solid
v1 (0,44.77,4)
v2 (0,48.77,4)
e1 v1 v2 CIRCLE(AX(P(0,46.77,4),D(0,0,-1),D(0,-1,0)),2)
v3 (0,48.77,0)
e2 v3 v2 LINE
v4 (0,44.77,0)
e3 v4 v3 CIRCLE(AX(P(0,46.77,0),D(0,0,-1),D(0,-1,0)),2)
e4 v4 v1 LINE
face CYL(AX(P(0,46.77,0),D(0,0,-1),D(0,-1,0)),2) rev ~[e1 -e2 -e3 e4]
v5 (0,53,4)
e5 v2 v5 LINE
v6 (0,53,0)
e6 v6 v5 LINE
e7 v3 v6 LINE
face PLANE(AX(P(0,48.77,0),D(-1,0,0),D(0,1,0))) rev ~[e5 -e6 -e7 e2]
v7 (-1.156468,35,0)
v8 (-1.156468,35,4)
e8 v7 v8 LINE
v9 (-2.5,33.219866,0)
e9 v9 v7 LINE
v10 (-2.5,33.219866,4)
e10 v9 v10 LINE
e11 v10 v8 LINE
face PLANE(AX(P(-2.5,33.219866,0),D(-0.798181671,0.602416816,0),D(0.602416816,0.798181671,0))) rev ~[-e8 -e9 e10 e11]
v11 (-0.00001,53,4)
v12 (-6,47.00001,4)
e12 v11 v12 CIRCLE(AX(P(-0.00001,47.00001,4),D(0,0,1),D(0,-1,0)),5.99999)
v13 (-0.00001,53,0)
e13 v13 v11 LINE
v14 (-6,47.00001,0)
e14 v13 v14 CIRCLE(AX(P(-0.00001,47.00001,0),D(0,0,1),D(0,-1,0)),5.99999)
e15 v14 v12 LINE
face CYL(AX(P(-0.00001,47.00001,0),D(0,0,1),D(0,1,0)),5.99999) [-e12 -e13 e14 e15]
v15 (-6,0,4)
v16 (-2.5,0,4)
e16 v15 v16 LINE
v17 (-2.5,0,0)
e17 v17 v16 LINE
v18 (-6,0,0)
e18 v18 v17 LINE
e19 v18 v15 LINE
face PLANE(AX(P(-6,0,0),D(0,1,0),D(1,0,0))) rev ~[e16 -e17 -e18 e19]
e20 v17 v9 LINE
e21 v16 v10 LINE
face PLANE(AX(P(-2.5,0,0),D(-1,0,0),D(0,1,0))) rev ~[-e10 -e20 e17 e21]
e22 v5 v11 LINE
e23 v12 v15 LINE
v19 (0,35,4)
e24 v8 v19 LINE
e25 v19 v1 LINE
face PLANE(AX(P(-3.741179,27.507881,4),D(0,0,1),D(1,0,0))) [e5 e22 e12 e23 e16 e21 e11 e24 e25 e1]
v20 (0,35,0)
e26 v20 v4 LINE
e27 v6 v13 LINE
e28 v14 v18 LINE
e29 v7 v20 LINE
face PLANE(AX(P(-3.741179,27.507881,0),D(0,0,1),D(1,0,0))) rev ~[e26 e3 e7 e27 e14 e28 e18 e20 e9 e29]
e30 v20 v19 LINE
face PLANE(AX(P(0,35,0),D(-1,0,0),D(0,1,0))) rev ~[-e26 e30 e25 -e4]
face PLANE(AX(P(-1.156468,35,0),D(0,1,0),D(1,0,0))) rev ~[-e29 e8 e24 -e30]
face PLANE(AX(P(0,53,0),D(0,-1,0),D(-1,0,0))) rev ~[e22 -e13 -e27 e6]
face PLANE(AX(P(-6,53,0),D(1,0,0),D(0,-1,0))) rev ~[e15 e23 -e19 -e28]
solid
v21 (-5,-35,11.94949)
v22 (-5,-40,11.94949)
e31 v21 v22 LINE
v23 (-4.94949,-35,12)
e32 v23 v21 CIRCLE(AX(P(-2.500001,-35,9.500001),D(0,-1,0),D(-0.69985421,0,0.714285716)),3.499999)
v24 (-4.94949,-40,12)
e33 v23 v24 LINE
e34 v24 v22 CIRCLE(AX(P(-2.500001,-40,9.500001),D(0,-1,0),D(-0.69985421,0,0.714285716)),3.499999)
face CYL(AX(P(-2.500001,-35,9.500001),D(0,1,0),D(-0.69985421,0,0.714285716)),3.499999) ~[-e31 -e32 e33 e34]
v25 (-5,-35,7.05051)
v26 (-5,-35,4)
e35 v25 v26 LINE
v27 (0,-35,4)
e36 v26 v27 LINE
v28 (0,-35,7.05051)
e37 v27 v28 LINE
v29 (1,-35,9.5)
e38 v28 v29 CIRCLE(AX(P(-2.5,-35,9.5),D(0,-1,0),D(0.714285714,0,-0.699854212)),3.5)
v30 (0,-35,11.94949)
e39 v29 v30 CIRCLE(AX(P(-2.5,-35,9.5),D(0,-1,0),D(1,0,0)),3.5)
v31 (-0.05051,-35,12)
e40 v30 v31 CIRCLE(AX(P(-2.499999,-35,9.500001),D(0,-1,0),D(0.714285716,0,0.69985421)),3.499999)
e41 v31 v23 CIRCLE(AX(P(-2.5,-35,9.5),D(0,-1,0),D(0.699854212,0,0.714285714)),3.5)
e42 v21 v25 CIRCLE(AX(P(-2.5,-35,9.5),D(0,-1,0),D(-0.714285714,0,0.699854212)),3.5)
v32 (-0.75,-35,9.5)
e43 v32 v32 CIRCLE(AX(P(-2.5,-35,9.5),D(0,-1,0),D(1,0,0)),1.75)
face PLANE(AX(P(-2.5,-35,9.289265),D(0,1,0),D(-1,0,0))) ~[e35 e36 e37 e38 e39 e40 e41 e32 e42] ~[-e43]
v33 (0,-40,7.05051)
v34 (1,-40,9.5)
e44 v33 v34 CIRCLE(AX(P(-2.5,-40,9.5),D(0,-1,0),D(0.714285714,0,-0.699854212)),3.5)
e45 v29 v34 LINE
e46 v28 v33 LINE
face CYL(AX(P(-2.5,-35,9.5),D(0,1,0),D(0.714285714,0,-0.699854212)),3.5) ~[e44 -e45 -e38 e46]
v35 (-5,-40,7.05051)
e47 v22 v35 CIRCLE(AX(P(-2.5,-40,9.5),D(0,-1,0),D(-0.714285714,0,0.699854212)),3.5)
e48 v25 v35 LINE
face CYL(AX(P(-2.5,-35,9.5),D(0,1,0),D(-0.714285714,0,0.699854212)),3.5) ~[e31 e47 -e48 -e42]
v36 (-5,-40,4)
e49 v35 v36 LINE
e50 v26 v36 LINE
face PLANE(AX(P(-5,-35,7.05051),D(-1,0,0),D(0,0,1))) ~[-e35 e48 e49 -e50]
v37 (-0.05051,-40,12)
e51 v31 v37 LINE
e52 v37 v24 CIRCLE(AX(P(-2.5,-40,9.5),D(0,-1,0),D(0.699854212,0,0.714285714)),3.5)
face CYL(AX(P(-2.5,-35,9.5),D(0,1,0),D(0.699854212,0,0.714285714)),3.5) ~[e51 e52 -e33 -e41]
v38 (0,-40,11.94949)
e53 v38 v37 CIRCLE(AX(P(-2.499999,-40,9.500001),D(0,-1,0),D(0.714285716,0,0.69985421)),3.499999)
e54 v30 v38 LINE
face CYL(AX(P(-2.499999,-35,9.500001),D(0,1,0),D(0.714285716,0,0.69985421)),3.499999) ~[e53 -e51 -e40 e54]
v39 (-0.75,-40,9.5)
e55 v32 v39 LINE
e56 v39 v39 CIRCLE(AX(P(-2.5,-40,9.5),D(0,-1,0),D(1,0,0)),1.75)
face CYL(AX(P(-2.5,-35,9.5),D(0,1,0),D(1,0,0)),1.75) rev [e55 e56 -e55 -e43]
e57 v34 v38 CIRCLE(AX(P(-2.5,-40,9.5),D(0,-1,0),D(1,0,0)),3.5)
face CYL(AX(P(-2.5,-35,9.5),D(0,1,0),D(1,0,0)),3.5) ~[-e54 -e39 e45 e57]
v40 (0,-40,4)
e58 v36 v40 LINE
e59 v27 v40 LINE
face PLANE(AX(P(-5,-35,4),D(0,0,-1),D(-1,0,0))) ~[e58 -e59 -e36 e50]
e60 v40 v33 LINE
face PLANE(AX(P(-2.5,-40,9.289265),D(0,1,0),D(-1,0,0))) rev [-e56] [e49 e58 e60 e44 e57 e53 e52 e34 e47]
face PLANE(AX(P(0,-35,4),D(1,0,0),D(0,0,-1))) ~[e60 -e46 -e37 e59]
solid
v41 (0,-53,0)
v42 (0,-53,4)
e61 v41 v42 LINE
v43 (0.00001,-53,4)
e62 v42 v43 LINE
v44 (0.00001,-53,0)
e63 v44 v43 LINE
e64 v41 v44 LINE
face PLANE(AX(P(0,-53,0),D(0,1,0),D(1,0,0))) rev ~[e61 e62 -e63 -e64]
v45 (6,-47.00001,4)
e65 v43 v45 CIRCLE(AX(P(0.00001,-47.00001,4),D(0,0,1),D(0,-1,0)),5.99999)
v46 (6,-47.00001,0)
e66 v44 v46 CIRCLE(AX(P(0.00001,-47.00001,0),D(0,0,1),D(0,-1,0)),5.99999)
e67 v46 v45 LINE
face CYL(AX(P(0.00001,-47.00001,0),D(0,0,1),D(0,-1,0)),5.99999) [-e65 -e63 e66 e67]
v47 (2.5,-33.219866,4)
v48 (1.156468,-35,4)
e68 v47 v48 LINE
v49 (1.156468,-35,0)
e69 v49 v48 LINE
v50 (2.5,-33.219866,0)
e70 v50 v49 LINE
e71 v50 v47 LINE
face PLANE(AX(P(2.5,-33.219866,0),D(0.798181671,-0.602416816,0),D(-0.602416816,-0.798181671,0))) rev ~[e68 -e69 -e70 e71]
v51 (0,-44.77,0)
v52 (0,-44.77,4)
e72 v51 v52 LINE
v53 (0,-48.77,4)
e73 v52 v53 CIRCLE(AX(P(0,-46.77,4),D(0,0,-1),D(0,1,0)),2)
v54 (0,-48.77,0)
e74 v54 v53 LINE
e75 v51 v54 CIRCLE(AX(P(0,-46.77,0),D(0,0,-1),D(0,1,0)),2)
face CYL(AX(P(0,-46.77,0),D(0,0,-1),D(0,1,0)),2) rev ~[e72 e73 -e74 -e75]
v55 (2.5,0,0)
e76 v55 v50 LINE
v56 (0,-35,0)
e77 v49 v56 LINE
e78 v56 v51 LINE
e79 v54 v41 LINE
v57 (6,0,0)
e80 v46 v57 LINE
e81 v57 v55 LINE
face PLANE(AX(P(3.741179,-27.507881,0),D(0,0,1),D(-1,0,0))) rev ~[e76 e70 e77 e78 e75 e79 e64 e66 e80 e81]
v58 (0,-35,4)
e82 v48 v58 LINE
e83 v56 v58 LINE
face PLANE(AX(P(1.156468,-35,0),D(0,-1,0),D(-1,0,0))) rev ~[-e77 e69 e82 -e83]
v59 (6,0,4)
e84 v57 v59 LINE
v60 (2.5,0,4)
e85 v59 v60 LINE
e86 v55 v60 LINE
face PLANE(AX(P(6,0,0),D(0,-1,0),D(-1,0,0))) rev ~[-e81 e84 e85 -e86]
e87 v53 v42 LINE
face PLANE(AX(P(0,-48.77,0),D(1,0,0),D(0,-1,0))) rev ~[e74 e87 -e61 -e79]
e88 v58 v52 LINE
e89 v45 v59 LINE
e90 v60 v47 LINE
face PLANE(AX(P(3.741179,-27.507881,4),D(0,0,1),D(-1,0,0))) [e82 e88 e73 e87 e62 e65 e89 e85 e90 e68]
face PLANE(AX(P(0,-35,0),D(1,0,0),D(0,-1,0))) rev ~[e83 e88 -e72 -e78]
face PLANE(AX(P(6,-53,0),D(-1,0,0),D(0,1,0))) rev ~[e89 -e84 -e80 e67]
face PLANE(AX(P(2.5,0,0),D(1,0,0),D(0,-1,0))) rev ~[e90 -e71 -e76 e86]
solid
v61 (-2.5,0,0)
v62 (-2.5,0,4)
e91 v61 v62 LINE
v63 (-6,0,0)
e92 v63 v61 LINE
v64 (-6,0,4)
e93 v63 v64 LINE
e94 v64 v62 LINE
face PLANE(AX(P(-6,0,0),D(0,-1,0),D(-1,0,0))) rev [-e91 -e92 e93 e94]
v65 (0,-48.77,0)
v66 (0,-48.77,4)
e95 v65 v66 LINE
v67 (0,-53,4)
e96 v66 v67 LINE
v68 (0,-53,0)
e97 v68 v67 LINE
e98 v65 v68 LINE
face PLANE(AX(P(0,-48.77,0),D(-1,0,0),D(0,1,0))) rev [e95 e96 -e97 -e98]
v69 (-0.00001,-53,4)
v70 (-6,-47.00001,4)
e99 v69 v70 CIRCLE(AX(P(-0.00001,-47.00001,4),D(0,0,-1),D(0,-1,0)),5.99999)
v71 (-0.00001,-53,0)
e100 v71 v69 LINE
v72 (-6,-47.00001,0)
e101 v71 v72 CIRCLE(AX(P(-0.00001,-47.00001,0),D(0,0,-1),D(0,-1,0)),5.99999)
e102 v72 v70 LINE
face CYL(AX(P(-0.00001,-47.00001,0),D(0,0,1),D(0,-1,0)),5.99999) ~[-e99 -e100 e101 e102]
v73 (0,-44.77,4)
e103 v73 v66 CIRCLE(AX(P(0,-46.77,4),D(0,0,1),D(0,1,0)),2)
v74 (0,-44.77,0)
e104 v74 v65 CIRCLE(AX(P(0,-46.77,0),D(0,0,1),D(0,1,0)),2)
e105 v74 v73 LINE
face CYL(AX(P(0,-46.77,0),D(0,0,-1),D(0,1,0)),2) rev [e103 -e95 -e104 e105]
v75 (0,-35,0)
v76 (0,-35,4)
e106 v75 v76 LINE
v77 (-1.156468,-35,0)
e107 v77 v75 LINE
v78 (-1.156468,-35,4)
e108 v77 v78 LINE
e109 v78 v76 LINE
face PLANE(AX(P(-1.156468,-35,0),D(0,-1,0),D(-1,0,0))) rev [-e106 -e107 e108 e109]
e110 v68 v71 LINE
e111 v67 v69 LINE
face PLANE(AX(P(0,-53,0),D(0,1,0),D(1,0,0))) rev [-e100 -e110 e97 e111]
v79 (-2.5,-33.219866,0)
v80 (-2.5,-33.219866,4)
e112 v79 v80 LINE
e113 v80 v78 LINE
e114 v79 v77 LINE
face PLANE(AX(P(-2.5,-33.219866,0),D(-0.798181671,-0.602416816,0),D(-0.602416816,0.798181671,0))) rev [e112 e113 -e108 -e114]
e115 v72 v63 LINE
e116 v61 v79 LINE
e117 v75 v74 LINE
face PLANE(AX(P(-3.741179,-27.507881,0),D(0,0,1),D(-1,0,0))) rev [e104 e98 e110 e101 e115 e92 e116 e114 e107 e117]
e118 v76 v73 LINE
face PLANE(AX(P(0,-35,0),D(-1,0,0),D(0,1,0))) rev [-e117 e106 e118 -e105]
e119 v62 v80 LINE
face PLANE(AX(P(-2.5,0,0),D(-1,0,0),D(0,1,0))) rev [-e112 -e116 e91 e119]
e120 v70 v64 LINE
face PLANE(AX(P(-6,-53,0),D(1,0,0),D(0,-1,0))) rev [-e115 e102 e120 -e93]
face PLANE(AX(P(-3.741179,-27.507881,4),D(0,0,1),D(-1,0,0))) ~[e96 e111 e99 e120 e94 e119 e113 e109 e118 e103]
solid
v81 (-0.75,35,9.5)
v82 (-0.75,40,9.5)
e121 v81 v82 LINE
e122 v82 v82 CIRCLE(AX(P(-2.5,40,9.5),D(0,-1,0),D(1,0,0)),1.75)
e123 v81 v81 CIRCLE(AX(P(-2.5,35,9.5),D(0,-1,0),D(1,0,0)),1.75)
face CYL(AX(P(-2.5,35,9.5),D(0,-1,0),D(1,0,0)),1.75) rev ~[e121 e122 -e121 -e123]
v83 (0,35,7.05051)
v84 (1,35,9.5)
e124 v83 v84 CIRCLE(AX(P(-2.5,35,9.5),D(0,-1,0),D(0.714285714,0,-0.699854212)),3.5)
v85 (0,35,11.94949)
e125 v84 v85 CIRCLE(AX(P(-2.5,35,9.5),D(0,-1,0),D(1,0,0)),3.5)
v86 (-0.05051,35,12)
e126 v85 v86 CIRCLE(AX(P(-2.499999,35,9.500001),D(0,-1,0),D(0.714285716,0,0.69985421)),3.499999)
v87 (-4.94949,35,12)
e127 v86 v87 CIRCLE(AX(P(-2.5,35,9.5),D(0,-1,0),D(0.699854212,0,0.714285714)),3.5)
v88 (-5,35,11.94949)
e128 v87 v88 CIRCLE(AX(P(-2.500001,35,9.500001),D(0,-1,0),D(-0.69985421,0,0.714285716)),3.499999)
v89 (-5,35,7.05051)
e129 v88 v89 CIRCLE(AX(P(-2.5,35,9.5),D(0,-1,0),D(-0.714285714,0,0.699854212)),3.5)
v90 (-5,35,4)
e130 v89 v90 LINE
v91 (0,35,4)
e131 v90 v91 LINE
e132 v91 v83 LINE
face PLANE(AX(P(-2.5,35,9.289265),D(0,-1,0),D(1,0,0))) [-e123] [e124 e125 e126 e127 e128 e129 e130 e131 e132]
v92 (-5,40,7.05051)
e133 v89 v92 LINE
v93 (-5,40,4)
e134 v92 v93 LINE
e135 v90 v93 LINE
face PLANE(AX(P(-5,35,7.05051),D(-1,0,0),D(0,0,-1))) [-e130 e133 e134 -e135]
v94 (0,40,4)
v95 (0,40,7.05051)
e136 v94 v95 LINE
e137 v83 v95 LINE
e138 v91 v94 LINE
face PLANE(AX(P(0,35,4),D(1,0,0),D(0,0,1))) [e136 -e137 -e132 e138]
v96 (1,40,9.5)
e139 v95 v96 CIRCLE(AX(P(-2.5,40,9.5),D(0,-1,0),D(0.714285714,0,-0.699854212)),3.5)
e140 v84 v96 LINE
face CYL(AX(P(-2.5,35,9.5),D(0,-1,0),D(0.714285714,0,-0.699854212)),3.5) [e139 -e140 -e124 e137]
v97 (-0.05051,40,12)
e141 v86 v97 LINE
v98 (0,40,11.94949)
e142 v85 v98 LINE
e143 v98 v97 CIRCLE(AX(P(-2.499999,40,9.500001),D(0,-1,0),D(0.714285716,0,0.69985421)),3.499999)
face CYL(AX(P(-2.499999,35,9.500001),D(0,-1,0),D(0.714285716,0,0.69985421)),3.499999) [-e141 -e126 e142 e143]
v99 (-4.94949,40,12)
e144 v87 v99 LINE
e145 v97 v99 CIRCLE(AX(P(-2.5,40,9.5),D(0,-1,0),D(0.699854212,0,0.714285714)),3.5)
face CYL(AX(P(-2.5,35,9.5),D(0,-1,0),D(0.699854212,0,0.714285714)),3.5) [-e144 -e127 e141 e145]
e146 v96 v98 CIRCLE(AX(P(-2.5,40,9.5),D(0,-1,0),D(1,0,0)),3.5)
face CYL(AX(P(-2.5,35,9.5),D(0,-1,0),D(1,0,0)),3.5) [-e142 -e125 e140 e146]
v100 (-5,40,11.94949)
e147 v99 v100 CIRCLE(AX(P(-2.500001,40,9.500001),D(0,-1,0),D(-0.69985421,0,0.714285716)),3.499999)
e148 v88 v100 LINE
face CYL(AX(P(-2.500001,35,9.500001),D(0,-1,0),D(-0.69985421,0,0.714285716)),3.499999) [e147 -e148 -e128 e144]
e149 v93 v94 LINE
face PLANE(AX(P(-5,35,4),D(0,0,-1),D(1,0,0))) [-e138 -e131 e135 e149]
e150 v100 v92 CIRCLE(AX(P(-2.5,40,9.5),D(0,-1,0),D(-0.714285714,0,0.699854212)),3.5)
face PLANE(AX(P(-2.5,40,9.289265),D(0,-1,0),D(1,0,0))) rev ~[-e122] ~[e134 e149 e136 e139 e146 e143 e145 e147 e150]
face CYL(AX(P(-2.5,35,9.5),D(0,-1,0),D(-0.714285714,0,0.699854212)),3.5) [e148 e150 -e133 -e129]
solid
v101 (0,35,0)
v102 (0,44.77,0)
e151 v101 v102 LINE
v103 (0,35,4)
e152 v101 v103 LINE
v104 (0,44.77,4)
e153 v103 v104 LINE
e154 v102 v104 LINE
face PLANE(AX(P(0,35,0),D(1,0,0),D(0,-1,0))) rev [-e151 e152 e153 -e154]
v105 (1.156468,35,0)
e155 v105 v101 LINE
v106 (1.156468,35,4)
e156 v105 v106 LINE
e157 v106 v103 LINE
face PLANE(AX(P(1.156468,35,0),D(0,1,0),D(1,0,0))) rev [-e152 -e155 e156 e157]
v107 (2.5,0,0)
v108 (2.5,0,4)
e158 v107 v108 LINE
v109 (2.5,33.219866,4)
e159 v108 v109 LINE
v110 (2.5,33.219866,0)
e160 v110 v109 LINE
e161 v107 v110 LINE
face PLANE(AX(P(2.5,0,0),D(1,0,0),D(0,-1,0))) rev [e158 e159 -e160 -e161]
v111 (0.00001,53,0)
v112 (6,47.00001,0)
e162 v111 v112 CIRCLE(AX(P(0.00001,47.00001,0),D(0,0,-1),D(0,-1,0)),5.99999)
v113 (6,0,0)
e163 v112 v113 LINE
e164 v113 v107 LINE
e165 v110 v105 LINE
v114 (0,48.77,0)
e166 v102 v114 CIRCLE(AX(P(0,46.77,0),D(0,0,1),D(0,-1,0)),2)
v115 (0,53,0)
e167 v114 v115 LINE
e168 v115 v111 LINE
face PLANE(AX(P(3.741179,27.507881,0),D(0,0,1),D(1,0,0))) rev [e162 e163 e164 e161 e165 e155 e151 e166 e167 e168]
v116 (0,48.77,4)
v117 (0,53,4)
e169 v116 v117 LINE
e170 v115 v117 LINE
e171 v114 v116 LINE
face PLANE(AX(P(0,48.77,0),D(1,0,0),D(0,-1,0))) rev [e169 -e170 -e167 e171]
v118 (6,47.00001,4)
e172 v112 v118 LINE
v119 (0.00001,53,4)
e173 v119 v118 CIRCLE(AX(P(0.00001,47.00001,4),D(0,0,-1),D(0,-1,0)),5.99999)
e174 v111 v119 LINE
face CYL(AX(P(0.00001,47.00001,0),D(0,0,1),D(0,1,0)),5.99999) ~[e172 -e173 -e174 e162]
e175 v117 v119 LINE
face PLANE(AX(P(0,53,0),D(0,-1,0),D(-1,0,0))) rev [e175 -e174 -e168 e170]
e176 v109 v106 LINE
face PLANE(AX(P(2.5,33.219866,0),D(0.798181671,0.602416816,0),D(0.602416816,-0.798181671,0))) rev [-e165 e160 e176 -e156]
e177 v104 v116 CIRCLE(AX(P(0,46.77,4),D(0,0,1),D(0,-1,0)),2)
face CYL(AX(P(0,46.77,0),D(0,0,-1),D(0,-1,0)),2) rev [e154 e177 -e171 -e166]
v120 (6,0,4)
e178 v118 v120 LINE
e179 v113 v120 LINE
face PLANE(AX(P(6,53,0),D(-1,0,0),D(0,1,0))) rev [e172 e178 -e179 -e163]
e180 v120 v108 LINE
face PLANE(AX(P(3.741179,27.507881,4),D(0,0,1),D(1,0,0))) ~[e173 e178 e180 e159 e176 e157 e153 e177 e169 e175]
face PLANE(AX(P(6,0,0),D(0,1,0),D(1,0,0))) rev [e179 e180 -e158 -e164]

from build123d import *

# Parameters (mm, degrees)
F1_DEPTH = 4
F3_START = -35
F2_R     = 1.75
F3_DEPTH = 5
F6_R     = 5.99999
F6_2_R   = 5.99999
F6_3_R   = 5.99999
F6_4_R   = 5.99999


# Not quite as in the source:
# - a fillet or chamfer is up to 0.001 mm smaller than in the source, because OpenCascade refuses the exact size


with BuildPart() as f1:
    # F0 (on Top) → F1 (new body)
    with BuildSketch(Plane.XY):
        with BuildLine():
            Line((-6, 0), (-2.5, 0))
            Line((-2.5, 0), (-2.5, 33.2198664546))
            Line((-2.5, 33.2198664546), (-1.1564682936, 35))
            Line((-1.1564682936, 35), (0, 35))
            Line((0, 35), (0, 44.77))
            ThreePointArc((0, 44.77), (-2, 46.77), (0, 48.77))
            Line((0, 48.77), (0, 53))
            Line((0, 53), (-6, 53))
            Line((-6, 53), (-6, 0))
        make_face()
    extrude(amount=F1_DEPTH)


with BuildPart() as f3:
    # F2 (on Front) → F3 (new body)
    with BuildSketch(Plane.XZ.offset(F3_START)):
        with BuildLine():
            ThreePointArc((-5, 7.0505102572), (-2.5, 6), (0, 7.0505102572))
            Line((0, 7.0505102572), (0, 11.9494897428))
            ThreePointArc((0, 11.9494897428), (-0.0251262658, 11.9748737342), (-0.0505102572, 12))
            Line((-0.0505102572, 12), (-4.9494897428, 12))
            ThreePointArc((-4.9494897428, 12), (-4.9748737342, 11.9748737342), (-5, 11.9494897428))
            Line((-5, 11.9494897428), (-5, 7.0505102572))
        make_face()
        with Locations((-2.5, 9.5)):
            Circle(F2_R, mode=Mode.SUBTRACT)
        with BuildLine():
            Line((-5, 4), (0, 4))
            Line((0, 4), (0, 7.0505102572))
            ThreePointArc((0, 7.0505102572), (-2.5, 6), (-5, 7.0505102572))
            Line((-5, 7.0505102572), (-5, 4))
        make_face()
        with BuildLine():
            Line((0, 11.9494897428), (0, 7.0505102572))
            ThreePointArc((0, 7.0505102572), (0.7403703492, 8.1771243445), (1, 9.5))
            ThreePointArc((1, 9.5), (0.7403703492, 10.8228756555), (0, 11.9494897428))
        make_face()
        with BuildLine():
            Line((-4.9494897428, 12), (-0.0505102572, 12))
            ThreePointArc((-0.0505102572, 12), (-2.5, 13), (-4.9494897428, 12))
        make_face()
        with BuildLine():
            ThreePointArc((-5, 11.9494897428), (-6, 9.5), (-5, 7.0505102572))
            Line((-5, 7.0505102572), (-5, 11.9494897428))
        make_face()
    extrude(amount=-F3_DEPTH)


with BuildPart() as f4_1:
    # F4: instance of F1
    add(f1.part.mirror(Plane(origin=(-4.25, 0, 2), x_dir=(1, 0, 0), z_dir=(0, -1, 0))))


with BuildPart() as f4_2:
    # F4: instance of F3
    add(f3.part.mirror(Plane(origin=(-4.25, 0, 2), x_dir=(1, 0, 0), z_dir=(0, -1, 0))))


with BuildPart() as f5_1:
    # F5: instance of F1
    add(f1.part.mirror(Plane(origin=(0, -39.885, 2), x_dir=(0, 1, 0), z_dir=(1, 0, 0))))

    # F6#3 (radius 6 in the source; OpenCascade refuses exactly that, so slightly less here)
    f6_3_edges = [f5_1.edges().sort_by_distance(p)[0] for p in [
        (6, 53, 2),
    ]]
    fillet(f6_3_edges, radius=F6_3_R)


with BuildPart() as f5_2:
    # F5: instance of F4_1
    add(f4_1.part.mirror(Plane(origin=(0, -39.885, 2), x_dir=(0, 1, 0), z_dir=(1, 0, 0))))

    # F6 (radius 6 in the source; OpenCascade refuses exactly that, so slightly less here)
    f6_edges = [f5_2.edges().sort_by_distance(p)[0] for p in [
        (6, -53, 2),
    ]]
    fillet(f6_edges, radius=F6_R)


with BuildPart() as f4_1_1:
    add(f4_1.part)

    # F6#2 (radius 6 in the source; OpenCascade refuses exactly that, so slightly less here)
    f6_2_edges = [f4_1_1.edges().sort_by_distance(p)[0] for p in [
        (-6, -53, 2),
    ]]
    fillet(f6_2_edges, radius=F6_2_R)


with BuildPart() as f1_1:
    add(f1.part)

    # F6#4 (radius 6 in the source; OpenCascade refuses exactly that, so slightly less here)
    f6_4_edges = [f1_1.edges().sort_by_distance(p)[0] for p in [
        (-6, 53, 2),
    ]]
    fillet(f6_4_edges, radius=F6_4_R)


solid = Compound([f3.part, f4_2.part, f5_1.part, f5_2.part, f4_1_1.part, f1_1.part])
